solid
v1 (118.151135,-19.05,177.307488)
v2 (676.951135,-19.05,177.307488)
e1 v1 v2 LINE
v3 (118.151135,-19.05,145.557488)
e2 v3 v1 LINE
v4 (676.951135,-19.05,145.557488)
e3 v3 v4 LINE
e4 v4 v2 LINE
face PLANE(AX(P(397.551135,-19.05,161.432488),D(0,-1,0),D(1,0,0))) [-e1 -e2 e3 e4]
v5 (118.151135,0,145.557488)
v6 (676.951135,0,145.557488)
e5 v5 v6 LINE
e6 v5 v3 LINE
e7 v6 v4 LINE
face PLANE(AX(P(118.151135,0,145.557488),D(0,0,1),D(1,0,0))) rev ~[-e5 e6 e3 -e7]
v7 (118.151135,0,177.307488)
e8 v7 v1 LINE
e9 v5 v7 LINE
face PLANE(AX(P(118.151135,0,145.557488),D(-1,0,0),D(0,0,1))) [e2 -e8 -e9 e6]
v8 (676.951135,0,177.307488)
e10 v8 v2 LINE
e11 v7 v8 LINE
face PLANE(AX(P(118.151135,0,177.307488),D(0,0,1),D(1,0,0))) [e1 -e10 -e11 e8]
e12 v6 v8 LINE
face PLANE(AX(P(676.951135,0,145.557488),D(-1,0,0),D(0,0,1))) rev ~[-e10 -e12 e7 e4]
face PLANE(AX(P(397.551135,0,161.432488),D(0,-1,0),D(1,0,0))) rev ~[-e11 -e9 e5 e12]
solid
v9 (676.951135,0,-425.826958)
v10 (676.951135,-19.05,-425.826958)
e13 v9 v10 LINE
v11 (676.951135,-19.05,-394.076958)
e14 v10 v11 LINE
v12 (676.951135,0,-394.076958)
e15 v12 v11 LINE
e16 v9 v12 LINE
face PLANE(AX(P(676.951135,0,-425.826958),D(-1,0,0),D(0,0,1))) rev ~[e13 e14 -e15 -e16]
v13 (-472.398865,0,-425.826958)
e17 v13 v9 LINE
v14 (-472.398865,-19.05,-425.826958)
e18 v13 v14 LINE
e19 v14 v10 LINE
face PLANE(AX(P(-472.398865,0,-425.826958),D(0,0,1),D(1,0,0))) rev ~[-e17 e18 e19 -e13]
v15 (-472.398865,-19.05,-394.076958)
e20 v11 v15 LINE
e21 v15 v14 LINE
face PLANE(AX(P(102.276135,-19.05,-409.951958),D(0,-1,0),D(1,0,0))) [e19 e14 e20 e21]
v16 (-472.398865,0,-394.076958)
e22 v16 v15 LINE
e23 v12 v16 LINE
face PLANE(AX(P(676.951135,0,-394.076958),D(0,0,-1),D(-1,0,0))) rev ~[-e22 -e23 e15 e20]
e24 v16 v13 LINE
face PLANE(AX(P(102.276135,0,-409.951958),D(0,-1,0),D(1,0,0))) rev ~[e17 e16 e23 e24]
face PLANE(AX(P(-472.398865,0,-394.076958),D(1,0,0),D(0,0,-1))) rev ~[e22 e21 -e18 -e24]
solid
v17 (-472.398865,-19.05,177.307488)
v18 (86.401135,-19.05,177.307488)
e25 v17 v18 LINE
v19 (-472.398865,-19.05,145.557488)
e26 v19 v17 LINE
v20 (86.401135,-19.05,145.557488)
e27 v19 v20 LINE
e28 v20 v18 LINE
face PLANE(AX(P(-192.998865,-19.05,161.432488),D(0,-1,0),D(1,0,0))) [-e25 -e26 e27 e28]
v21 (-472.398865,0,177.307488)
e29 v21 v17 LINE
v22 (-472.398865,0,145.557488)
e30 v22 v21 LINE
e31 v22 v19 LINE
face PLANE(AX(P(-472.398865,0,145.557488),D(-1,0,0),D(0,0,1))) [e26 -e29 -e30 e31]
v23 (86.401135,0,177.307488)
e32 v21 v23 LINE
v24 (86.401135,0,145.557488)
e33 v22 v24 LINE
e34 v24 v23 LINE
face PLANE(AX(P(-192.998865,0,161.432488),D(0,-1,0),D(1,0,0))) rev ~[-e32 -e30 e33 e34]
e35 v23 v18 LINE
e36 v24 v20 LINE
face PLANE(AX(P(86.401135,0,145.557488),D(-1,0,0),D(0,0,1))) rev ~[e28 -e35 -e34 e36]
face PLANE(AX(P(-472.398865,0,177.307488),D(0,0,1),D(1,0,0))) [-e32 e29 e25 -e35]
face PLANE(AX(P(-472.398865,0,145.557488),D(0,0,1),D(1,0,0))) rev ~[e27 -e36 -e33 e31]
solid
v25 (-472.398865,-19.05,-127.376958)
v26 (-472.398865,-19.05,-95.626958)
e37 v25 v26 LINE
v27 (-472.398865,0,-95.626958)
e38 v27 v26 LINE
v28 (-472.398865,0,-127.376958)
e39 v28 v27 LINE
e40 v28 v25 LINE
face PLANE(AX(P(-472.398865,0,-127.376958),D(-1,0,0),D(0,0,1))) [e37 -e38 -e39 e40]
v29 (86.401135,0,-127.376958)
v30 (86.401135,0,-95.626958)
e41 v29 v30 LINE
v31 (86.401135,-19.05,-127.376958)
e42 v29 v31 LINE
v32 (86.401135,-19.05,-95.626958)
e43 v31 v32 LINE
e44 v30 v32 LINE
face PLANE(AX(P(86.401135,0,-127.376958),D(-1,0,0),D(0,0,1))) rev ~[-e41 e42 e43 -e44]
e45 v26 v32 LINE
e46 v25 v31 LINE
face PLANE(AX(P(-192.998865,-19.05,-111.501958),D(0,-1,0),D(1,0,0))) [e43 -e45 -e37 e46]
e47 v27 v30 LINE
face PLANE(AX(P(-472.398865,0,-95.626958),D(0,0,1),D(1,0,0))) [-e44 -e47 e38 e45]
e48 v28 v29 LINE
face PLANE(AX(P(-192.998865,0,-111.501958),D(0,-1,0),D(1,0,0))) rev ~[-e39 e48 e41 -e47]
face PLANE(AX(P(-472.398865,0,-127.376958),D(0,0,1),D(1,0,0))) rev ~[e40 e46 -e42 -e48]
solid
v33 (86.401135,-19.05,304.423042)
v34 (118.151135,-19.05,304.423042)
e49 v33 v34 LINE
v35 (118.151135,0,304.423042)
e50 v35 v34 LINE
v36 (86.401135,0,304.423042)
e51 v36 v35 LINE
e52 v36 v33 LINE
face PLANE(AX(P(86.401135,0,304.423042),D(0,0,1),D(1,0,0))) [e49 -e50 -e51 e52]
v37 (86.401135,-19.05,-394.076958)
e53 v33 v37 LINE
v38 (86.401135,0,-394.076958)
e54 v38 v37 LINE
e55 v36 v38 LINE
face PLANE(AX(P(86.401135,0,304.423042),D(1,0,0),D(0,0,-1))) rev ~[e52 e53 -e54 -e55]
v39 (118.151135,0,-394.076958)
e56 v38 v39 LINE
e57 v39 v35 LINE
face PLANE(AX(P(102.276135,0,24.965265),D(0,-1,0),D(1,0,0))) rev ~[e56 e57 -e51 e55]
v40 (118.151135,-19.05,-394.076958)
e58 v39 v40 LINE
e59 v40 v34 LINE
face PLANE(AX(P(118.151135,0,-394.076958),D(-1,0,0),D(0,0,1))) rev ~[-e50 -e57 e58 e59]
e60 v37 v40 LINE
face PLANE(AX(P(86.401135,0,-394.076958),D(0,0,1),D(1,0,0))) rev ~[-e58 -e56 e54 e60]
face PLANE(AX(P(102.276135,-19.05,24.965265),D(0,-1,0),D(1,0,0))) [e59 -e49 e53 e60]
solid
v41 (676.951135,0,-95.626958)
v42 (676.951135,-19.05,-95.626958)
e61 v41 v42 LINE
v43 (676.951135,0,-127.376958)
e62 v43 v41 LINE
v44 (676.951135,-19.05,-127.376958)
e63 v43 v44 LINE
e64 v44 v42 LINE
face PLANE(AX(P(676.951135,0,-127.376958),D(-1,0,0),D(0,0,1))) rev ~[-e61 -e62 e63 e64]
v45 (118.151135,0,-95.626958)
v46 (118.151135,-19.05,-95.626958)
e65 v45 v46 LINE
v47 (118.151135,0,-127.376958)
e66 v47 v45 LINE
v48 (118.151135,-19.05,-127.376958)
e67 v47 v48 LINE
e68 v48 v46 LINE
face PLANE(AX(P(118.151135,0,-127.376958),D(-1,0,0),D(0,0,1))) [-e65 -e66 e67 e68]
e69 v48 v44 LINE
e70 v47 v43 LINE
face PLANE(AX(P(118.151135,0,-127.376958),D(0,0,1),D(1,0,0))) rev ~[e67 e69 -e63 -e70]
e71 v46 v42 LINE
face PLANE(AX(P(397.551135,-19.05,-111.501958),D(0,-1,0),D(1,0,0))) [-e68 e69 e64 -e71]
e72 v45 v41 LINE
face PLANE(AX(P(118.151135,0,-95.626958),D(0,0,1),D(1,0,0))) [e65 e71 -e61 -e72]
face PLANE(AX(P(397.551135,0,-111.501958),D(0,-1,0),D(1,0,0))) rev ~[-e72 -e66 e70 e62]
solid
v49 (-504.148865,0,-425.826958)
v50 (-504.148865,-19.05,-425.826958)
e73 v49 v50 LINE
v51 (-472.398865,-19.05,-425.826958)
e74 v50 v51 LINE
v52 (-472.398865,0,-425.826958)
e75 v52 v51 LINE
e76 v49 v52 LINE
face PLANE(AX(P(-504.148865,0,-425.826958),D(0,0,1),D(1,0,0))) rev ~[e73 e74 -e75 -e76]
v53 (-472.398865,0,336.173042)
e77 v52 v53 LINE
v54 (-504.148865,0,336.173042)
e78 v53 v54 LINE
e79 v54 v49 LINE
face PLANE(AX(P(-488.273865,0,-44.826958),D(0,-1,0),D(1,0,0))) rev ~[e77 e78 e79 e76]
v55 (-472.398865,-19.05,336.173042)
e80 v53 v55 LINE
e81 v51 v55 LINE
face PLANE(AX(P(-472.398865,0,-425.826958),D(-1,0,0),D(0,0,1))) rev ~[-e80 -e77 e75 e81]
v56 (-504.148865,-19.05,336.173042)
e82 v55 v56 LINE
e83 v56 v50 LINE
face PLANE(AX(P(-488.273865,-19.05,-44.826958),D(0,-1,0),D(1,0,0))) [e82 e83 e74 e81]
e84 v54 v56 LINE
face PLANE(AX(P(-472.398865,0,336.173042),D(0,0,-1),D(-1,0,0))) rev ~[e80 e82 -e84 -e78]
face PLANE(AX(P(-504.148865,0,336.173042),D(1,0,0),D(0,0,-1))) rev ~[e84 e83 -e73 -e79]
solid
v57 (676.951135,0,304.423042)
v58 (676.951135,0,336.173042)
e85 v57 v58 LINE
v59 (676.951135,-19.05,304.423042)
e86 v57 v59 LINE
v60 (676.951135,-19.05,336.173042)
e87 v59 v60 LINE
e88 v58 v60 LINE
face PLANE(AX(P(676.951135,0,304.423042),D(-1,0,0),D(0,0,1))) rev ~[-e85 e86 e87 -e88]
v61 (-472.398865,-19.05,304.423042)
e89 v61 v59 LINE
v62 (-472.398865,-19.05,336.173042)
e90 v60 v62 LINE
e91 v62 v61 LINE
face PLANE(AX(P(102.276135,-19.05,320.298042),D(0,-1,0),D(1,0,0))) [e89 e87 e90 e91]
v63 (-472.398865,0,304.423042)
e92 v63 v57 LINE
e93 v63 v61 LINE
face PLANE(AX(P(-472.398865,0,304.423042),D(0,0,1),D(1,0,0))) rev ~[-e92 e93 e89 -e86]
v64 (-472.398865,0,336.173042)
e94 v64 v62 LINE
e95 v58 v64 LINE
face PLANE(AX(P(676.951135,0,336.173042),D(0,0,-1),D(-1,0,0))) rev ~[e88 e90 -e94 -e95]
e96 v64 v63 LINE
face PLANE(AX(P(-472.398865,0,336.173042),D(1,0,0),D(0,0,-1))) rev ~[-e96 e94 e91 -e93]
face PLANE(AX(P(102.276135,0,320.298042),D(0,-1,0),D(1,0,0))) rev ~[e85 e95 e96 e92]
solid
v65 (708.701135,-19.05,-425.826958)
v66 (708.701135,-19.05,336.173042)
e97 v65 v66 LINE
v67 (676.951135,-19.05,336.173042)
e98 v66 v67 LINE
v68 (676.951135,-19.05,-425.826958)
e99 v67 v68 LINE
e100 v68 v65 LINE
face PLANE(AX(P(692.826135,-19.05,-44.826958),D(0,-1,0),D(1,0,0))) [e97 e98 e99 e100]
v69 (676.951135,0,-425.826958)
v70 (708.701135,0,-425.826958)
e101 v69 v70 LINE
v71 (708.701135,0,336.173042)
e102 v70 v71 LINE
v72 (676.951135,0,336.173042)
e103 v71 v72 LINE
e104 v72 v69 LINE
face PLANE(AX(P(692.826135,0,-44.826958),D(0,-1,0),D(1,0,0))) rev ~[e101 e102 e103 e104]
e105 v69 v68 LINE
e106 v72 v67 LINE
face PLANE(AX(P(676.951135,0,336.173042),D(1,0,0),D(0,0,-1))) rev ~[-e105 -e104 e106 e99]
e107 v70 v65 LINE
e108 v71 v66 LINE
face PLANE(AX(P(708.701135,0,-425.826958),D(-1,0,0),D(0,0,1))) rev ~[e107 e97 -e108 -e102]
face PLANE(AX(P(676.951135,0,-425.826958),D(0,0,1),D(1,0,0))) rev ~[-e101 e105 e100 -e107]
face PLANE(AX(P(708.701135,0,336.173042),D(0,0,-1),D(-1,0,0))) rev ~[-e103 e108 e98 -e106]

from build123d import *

# Parameters (mm, degrees)
F1_DEPTH = 19.05
F0_W     = 31.75
F0_H     = 241.1844468117
F0_H_2   = 31.75
F0_H_3   = 127.1155531883
F0_H_4   = 266.7
F2_DEPTH = 19.05
F0_W_2   = 558.8


with BuildPart() as f1:
    # F0 (on Front) → F1 (new body)
    with BuildSketch(Plane.XZ):
        Polygon((-504.1488654983, 336.173041563), (-504.1488654983, -425.826958437), (-472.3988654983, -425.826958437), (-472.3988654983, -394.076958437), (-472.3988654983, -127.376958437), (-472.3988654983, -95.626958437), (-472.3988654983, 145.5574883747), (-472.3988654983, 177.3074883747), (-472.3988654983, 304.423041563), (-472.3988654983, 336.173041563), align=None)
    extrude(amount=F1_DEPTH)


with BuildPart() as f1b:
    # F0 (on Front) → F1, piece 2 (new body)
    with BuildSketch(Plane.XZ):
        with Locations((102.2761345017, 24.9652649688)):
            Rectangle(F0_W, F0_H)
        with Locations((102.2761345017, 161.4324883747)):
            Rectangle(F0_W, F0_H_2)
        with Locations((102.2761345017, 240.8652649688)):
            Rectangle(F0_W, F0_H_3)
        with Locations((102.2761345017, -260.726958437)):
            Rectangle(F0_W, F0_H_4)
        with Locations((102.2761345017, -111.501958437)):
            Rectangle(F0_W, F0_H_2)
    extrude(amount=F1_DEPTH)


with BuildPart() as f1c:
    # F0 (on Front) → F1, piece 3 (new body)
    with BuildSketch(Plane.XZ):
        Polygon((676.9511345017, -394.076958437), (676.9511345017, -425.826958437), (708.7011345017, -425.826958437), (708.7011345017, 336.173041563), (676.9511345017, 336.173041563), (676.9511345017, 304.423041563), (676.9511345017, 177.3074883747), (676.9511345017, 145.5574883747), (676.9511345017, -95.626958437), (676.9511345017, -127.376958437), align=None)
    extrude(amount=F1_DEPTH)


with BuildPart() as f2:
    # F0 (on Front) → F2 (new body)
    with BuildSketch(Plane.XZ):
        Polygon((676.9511345017, 336.173041563), (-472.3988654983, 336.173041563), (-472.3988654983, 304.423041563), (86.4011345017, 304.423041563), (118.1511345017, 304.423041563), (676.9511345017, 304.423041563), align=None)
    extrude(amount=F2_DEPTH)


with BuildPart() as f2b:
    # F0 (on Front) → F2, piece 2 (new body)
    with BuildSketch(Plane.XZ):
        with Locations((-192.9988654983, 161.4324883747)):
            Rectangle(F0_W_2, F0_H_2)
    extrude(amount=F2_DEPTH)


with BuildPart() as f2c:
    # F0 (on Front) → F2, piece 3 (new body)
    with BuildSketch(Plane.XZ):
        with Locations((-192.9988654983, -111.501958437)):
            Rectangle(F0_W_2, F0_H_2)
    extrude(amount=F2_DEPTH)


with BuildPart() as f2d:
    # F0 (on Front) → F2, piece 4 (new body)
    with BuildSketch(Plane.XZ):
        Polygon((-472.3988654983, -394.076958437), (-472.3988654983, -425.826958437), (676.9511345017, -425.826958437), (676.9511345017, -394.076958437), (118.1511345017, -394.076958437), (86.4011345017, -394.076958437), align=None)
    extrude(amount=F2_DEPTH)


with BuildPart() as f2e:
    # F0 (on Front) → F2, piece 5 (new body)
    with BuildSketch(Plane.XZ):
        with Locations((397.5511345017, -111.501958437)):
            Rectangle(F0_W_2, F0_H_2)
    extrude(amount=F2_DEPTH)


with BuildPart() as f2f:
    # F0 (on Front) → F2, piece 6 (new body)
    with BuildSketch(Plane.XZ):
        with Locations((397.5511345017, 161.4324883747)):
            Rectangle(F0_W_2, F0_H_2)
    extrude(amount=F2_DEPTH)


solid = Compound([f1.part, f1b.part, f1c.part, f2.part, f2b.part, f2c.part, f2d.part, f2e.part, f2f.part])
